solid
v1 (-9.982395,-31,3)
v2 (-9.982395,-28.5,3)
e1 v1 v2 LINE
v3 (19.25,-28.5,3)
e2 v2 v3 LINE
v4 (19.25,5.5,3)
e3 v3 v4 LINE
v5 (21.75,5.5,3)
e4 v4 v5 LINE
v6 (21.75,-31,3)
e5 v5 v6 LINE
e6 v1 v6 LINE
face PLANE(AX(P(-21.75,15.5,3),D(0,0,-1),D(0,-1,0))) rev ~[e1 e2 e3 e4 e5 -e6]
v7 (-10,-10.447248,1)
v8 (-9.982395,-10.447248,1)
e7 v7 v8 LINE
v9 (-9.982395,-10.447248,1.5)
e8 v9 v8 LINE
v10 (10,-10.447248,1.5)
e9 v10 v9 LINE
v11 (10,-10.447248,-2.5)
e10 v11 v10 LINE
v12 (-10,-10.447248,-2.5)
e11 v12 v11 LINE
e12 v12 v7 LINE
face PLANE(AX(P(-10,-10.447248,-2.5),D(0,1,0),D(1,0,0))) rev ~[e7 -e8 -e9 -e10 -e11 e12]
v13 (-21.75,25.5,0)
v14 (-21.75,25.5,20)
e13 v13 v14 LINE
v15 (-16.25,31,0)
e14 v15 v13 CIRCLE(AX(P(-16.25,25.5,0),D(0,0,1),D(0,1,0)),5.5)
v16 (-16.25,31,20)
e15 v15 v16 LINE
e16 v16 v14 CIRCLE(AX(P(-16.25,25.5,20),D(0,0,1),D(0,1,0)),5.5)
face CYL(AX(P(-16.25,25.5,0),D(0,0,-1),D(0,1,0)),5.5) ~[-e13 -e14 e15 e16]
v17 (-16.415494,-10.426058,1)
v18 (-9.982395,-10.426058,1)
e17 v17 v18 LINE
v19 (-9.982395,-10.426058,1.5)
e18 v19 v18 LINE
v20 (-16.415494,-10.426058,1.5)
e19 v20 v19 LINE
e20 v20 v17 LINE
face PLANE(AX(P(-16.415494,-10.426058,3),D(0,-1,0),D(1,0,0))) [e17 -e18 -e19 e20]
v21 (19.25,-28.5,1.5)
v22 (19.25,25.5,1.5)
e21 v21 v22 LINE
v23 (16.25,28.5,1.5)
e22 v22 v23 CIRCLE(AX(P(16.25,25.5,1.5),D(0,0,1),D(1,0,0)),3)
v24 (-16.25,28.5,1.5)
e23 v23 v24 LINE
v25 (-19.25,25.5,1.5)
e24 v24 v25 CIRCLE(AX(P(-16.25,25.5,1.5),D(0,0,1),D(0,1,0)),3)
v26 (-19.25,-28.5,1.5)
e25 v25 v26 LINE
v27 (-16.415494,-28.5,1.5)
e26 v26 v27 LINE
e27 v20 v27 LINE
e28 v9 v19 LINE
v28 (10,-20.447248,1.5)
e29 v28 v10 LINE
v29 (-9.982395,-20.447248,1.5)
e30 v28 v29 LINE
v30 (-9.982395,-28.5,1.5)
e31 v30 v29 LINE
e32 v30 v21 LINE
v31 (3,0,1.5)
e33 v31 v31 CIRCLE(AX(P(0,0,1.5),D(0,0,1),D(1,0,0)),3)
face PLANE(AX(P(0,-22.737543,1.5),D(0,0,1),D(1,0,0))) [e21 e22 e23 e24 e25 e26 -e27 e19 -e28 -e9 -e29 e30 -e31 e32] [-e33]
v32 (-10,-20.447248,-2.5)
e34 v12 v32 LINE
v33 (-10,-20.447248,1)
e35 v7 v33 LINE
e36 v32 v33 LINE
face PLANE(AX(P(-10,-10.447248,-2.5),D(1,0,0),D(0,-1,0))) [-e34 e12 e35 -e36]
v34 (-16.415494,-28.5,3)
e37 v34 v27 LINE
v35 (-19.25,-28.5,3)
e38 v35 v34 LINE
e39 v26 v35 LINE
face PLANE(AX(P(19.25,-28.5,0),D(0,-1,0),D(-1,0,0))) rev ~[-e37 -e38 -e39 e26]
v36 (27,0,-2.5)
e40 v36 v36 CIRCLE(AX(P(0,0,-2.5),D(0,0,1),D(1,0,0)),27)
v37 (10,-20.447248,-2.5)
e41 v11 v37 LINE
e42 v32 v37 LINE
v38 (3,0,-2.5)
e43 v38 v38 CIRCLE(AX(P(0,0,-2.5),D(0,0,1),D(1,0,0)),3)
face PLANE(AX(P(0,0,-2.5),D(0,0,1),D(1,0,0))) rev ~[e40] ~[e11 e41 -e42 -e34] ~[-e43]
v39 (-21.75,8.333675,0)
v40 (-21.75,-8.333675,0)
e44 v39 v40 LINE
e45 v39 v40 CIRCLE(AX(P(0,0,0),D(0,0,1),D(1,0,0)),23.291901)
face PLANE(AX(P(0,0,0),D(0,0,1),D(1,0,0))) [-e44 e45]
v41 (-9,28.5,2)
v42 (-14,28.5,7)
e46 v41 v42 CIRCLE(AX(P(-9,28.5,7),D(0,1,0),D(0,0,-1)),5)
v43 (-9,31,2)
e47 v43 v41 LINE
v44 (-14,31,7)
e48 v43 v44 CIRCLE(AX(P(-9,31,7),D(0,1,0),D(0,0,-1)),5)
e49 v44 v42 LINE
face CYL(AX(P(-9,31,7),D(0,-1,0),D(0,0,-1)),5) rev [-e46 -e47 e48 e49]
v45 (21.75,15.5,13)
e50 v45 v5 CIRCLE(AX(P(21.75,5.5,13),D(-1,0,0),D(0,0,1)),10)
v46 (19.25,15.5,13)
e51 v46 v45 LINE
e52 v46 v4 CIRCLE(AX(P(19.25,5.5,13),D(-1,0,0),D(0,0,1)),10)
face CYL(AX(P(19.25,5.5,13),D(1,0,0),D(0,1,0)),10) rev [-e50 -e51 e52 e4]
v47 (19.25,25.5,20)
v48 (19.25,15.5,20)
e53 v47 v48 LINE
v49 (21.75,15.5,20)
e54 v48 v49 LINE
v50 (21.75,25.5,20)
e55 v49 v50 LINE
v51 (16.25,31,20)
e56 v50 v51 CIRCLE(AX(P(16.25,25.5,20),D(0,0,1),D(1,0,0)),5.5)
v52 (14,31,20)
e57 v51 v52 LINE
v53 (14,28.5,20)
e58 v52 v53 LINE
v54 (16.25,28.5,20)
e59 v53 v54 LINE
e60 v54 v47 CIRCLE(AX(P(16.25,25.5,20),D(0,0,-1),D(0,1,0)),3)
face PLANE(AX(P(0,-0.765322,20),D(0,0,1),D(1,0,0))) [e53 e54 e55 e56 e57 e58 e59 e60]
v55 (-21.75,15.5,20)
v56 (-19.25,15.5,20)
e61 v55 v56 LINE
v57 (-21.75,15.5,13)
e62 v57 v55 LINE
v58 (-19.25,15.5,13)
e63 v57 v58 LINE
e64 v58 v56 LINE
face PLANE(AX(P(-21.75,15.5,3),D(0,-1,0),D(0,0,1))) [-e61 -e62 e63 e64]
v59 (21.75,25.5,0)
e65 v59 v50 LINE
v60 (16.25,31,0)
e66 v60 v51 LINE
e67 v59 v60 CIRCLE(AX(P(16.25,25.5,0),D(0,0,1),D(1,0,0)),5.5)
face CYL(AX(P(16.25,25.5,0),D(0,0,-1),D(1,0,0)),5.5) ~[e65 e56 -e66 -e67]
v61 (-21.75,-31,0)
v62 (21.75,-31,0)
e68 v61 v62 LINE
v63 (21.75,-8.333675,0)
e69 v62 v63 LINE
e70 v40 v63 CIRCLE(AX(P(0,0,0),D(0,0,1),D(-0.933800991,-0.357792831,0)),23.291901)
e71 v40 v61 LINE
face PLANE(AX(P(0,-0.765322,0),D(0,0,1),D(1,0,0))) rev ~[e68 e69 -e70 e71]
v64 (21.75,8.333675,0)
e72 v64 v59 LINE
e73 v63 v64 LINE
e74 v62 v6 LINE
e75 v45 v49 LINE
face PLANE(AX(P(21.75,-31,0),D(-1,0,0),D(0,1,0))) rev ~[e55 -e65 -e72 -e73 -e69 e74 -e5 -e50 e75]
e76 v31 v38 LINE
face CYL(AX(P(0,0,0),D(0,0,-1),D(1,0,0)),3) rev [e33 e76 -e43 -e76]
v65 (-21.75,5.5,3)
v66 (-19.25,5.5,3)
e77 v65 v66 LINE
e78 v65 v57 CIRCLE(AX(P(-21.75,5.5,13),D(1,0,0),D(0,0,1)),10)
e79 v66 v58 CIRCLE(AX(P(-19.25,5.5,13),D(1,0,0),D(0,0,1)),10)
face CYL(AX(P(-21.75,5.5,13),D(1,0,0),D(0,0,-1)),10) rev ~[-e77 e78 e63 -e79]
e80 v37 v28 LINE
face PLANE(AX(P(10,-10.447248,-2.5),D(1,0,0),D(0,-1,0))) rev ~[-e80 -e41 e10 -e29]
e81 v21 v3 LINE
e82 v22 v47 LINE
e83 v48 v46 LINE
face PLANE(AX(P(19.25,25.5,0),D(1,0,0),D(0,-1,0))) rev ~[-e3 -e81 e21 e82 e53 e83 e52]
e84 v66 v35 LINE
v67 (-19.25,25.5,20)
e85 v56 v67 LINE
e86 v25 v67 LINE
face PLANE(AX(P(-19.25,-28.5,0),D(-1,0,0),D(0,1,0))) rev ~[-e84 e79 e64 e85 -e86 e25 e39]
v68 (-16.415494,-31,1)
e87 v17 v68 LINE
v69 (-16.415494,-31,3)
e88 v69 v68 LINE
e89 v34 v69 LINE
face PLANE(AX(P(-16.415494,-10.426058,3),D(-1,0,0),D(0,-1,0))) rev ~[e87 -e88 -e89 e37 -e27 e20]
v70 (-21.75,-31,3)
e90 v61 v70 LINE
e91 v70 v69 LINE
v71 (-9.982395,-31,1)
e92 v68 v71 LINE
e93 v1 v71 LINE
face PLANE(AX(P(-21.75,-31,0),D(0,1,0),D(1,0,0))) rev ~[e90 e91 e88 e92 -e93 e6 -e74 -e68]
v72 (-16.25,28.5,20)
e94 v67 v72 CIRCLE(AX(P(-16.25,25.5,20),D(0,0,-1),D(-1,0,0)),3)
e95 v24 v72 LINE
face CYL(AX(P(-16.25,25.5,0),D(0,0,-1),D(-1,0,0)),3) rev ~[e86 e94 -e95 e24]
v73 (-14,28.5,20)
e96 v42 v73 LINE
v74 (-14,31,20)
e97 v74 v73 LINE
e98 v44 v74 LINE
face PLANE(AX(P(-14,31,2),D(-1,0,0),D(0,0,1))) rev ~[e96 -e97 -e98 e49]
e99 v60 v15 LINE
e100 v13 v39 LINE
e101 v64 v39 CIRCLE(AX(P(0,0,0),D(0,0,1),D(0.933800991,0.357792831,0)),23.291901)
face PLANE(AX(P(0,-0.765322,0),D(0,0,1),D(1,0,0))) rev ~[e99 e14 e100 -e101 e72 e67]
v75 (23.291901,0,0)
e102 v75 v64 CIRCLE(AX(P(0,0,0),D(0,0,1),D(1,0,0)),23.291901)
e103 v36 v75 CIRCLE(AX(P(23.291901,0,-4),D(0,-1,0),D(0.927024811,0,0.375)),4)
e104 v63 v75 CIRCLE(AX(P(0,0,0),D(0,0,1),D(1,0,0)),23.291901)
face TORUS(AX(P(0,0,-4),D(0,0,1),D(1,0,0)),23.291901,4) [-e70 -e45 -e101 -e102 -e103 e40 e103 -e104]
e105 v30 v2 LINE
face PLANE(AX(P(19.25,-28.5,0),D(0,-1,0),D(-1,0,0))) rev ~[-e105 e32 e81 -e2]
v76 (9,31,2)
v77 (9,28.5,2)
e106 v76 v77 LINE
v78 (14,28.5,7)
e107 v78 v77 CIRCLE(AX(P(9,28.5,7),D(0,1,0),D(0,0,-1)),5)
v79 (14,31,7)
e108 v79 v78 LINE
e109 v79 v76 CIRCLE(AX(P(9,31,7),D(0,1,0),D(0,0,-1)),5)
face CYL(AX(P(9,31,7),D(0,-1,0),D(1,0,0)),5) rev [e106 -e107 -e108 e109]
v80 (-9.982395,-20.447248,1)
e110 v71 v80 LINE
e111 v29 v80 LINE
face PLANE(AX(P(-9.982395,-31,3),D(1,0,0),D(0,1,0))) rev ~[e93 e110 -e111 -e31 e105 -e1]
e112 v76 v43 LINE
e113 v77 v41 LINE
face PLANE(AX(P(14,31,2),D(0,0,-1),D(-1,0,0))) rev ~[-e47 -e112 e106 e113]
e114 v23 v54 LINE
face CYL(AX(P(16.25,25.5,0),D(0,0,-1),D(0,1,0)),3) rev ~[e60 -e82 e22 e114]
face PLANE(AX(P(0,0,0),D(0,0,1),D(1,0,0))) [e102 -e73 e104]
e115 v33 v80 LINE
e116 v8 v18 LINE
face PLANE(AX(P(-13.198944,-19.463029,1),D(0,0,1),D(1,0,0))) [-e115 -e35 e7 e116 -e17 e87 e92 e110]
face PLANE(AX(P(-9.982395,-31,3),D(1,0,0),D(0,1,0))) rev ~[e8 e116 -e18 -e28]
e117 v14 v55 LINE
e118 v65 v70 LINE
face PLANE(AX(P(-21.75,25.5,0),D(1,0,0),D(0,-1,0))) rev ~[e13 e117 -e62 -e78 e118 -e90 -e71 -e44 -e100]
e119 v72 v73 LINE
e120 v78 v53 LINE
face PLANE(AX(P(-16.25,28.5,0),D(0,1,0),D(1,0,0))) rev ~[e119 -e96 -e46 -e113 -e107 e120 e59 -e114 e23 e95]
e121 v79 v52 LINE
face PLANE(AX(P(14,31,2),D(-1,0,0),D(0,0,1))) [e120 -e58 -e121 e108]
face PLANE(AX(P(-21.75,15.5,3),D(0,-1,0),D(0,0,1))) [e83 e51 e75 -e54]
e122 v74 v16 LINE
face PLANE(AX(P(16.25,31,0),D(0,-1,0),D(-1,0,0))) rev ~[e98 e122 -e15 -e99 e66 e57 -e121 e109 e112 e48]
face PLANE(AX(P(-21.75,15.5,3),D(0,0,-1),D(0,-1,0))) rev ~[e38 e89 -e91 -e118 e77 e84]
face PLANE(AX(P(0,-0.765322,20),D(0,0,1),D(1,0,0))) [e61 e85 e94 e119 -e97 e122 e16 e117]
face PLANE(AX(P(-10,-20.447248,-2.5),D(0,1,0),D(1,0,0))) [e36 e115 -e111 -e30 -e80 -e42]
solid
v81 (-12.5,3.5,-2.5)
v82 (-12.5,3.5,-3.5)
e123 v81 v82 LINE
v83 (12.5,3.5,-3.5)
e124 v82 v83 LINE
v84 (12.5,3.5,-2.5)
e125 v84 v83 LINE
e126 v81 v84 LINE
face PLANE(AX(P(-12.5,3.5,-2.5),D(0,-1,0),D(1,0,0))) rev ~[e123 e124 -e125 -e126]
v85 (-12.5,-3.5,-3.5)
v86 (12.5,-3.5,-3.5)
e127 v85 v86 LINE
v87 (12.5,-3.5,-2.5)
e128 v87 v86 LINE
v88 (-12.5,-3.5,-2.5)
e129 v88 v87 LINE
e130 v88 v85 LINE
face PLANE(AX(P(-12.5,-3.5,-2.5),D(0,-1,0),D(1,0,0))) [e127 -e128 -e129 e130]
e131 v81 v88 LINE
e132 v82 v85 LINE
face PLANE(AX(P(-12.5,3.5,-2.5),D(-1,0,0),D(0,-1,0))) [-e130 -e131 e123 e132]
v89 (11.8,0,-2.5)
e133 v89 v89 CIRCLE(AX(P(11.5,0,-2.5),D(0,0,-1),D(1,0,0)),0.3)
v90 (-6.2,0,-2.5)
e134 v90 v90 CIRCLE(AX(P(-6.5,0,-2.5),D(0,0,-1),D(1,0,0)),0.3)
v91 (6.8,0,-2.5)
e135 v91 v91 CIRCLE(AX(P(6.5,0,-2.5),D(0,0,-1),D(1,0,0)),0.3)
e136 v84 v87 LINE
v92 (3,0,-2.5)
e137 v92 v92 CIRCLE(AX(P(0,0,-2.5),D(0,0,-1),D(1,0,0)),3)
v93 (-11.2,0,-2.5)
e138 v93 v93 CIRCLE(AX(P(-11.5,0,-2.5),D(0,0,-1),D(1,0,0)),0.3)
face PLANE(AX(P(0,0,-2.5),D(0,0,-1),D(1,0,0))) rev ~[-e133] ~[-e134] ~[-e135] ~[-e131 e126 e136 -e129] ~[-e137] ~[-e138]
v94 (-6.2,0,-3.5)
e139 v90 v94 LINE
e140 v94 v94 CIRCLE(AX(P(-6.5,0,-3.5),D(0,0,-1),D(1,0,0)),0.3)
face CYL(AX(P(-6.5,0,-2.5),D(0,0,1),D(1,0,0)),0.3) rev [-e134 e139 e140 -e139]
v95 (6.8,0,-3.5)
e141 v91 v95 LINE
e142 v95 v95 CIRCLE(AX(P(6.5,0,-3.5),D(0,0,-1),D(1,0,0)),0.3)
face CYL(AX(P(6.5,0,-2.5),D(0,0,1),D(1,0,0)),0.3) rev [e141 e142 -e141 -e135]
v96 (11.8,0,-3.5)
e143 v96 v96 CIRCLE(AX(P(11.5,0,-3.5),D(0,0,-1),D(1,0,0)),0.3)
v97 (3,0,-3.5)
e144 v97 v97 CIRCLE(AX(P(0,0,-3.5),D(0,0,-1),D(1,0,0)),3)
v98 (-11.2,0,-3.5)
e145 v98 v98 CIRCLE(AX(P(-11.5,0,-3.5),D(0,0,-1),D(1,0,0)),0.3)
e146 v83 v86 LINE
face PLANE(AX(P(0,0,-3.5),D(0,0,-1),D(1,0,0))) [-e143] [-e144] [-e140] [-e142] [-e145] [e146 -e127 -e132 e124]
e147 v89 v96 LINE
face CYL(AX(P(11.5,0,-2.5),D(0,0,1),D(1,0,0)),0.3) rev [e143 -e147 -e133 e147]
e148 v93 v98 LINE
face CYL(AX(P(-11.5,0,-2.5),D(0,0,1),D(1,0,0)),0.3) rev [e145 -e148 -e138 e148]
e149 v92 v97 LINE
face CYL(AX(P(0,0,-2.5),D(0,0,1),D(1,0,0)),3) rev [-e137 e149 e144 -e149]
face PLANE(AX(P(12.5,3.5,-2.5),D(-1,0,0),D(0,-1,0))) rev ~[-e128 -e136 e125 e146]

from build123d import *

# Parameters (mm, degrees)
F0_R      = 27
F0_R_2    = 3
F1_DEPTH  = 2.5
F2_W      = 25
F2_H      = 7
F2_R      = 0.3
F2_R_2    = 3
F3_DEPTH  = 1
F5_R      = 3
F6_DEPTH  = 1.5
F7_DEPTH  = 20
F8_W      = 36.5
F8_H      = 17
F8_W_2    = 10
F9_DEPTH  = 48.751
F10_W     = 28
F10_H     = 18
F11_DEPTH = 2.5
F12_R     = 10
F13_R     = 5
F14_W     = 20
F14_H     = 10
F15_DEPTH = 25
F16_W     = 6.433098577
F16_H     = 18.0739424974
F16_H_2   = 2.5
F17_DEPTH = 2


# Not quite as in the source:
# - a fillet or chamfer that OpenCascade refuses, or shapes differently, is made with other operations: its cross-section is extruded or revolved along the edge and cut away or added


with BuildPart() as f1:
    # F0 (on Top) → F1 (new body)
    with BuildSketch(Plane.XY):
        Circle(F0_R)
        Circle(F0_R_2, mode=Mode.SUBTRACT)
    extrude(amount=-F1_DEPTH)

    # F4: fillet of radius 4 on 1 edges, made by hand

    # F4_s1 → F4_t2 (revolve, cut)
    with BuildSketch(Plane.XZ):
        with BuildLine():
            ThreePointArc((27, -2.5), (25.527968734, -0.6833752096), (23.2919007565, 0))
            Line((23.2919007565, 0), (27, 0))
            Line((27, 0), (27, -2.5))
        make_face()
    revolve(axis=Axis((0, 0, 0), (0, 0, 1)), mode=Mode.SUBTRACT)

    # F5 (on face) → F6 (join)
    with BuildSketch(Plane.XY):
        with BuildLine():
            Line((-19.25, -28.5), (19.25, -28.5))
            Line((19.25, -28.5), (19.25, -13.1129760486))
            ThreePointArc((19.25, -13.1129760486), (0, -23.2919007565), (-19.25, -13.1129760486))
            Line((-19.25, -13.1129760486), (-19.25, -28.5))
        make_face()
        with BuildLine():
            ThreePointArc((-19.25, -13.1129760486), (0, -23.2919007565), (19.25, -13.1129760486))
            Line((19.25, -13.1129760486), (19.25, 13.1129760486))
            ThreePointArc((19.25, 13.1129760486), (0, 23.2919007565), (-19.25, 13.1129760486))
            Line((-19.25, 13.1129760486), (-19.25, -13.1129760486))
        make_face()
        Circle(F5_R, mode=Mode.SUBTRACT)
        with BuildLine():
            ThreePointArc((-19.25, 13.1129760486), (0, 23.2919007565), (19.25, 13.1129760486))
            Line((19.25, 13.1129760486), (19.25, 25.5))
            ThreePointArc((19.25, 25.5), (18.3713203436, 27.6213203436), (16.25, 28.5))
            Line((16.25, 28.5), (-16.25, 28.5))
            ThreePointArc((-16.25, 28.5), (-18.3713203436, 27.6213203436), (-19.25, 25.5))
            Line((-19.25, 25.5), (-19.25, 13.1129760486))
        make_face()
    extrude(amount=F6_DEPTH)

    # F5 (on face) → F7 (join)
    with BuildSketch(Plane.XY):
        with BuildLine():
            ThreePointArc((21.75, 25.5), (20.1390872965, 29.3890872965), (16.25, 31))
            Line((16.25, 31), (-16.25, 31))
            ThreePointArc((-16.25, 31), (-20.1390872965, 29.3890872965), (-21.75, 25.5))
            Line((-21.75, 25.5), (-21.75, -31))
            Line((-21.75, -31), (21.75, -31))
            Line((21.75, -31), (21.75, 25.5))
        make_face()
        with BuildLine():
            Line((19.25, 25.5), (19.25, -28.5))
            Line((19.25, -28.5), (-19.25, -28.5))
            Line((-19.25, -28.5), (-19.25, 25.5))
            ThreePointArc((-19.25, 25.5), (-18.3713203436, 27.6213203436), (-16.25, 28.5))
            Line((-16.25, 28.5), (16.25, 28.5))
            ThreePointArc((16.25, 28.5), (18.3713203436, 27.6213203436), (19.25, 25.5))
        make_face(mode=Mode.SUBTRACT)
    extrude(amount=F7_DEPTH)

    # F8 (on face) → F9 (cut, through all)
    with BuildSketch(Plane(origin=(-21.75, 0, 0), x_dir=(0, -1, 0), z_dir=(-1, 0, 0))):
        with Locations((2.75, 11.5)):
            Rectangle(F8_W, F8_H)
        with Locations((26, 11.5)):
            Rectangle(F8_W_2, F8_H)
    extrude(amount=-F9_DEPTH, mode=Mode.SUBTRACT)

    # F10 (on face) → F11 (cut)
    with BuildSketch(Plane(origin=(0, 31, 0), x_dir=(-1, 0, 0), z_dir=(0, 1, 0))):
        with Locations((0, 11)):
            Rectangle(F10_W, F10_H)
    extrude(amount=-F11_DEPTH, mode=Mode.SUBTRACT)

    # F12
    f12_edges = [f1.edges().sort_by_distance(p)[0] for p in [
        (-20.5, 15.5, 3),
        (20.5, 15.5, 3),
    ]]
    fillet(f12_edges, radius=F12_R)

    # F13
    f13_edges = [f1.edges().sort_by_distance(p)[0] for p in [
        (14, 29.75, 2),
        (-14, 29.75, 2),
    ]]
    fillet(f13_edges, radius=F13_R)

    # F14 (on face) → F15 (cut)
    with BuildSketch(Plane(origin=(0, 0, -2.5), x_dir=(1, 0, 0), z_dir=(0, 0, -1))):
        with Locations((0, 15.4472477734)):
            Rectangle(F14_W, F14_H)
    extrude(amount=-F15_DEPTH, mode=Mode.SUBTRACT)

    # F16 (on face) → F17 (cut)
    with BuildSketch(Plane.XY.offset(3)):
        with Locations((-13.1989442743, -19.4630287513)):
            Rectangle(F16_W, F16_H)
        with Locations((-13.1989442743, -29.75)):
            Rectangle(F16_W, F16_H_2)
    extrude(amount=-F17_DEPTH, mode=Mode.SUBTRACT)


with BuildPart() as f3:
    # F2 (on face) → F3 (new body)
    with BuildSketch(Plane(origin=(0, 0, -2.5), x_dir=(1, 0, 0), z_dir=(0, 0, -1))):
        Rectangle(F2_W, F2_H)
        with Locations((-11.5, 0)):
            Circle(F2_R, mode=Mode.SUBTRACT)
        with Locations((-6.5, 0)):
            Circle(F2_R, mode=Mode.SUBTRACT)
        Circle(F2_R_2, mode=Mode.SUBTRACT)
        with Locations((6.5, 0)):
            Circle(F2_R, mode=Mode.SUBTRACT)
        with Locations((11.5, 0)):
            Circle(F2_R, mode=Mode.SUBTRACT)
    extrude(amount=F3_DEPTH)


solid = Compound([f1.part, f3.part])
